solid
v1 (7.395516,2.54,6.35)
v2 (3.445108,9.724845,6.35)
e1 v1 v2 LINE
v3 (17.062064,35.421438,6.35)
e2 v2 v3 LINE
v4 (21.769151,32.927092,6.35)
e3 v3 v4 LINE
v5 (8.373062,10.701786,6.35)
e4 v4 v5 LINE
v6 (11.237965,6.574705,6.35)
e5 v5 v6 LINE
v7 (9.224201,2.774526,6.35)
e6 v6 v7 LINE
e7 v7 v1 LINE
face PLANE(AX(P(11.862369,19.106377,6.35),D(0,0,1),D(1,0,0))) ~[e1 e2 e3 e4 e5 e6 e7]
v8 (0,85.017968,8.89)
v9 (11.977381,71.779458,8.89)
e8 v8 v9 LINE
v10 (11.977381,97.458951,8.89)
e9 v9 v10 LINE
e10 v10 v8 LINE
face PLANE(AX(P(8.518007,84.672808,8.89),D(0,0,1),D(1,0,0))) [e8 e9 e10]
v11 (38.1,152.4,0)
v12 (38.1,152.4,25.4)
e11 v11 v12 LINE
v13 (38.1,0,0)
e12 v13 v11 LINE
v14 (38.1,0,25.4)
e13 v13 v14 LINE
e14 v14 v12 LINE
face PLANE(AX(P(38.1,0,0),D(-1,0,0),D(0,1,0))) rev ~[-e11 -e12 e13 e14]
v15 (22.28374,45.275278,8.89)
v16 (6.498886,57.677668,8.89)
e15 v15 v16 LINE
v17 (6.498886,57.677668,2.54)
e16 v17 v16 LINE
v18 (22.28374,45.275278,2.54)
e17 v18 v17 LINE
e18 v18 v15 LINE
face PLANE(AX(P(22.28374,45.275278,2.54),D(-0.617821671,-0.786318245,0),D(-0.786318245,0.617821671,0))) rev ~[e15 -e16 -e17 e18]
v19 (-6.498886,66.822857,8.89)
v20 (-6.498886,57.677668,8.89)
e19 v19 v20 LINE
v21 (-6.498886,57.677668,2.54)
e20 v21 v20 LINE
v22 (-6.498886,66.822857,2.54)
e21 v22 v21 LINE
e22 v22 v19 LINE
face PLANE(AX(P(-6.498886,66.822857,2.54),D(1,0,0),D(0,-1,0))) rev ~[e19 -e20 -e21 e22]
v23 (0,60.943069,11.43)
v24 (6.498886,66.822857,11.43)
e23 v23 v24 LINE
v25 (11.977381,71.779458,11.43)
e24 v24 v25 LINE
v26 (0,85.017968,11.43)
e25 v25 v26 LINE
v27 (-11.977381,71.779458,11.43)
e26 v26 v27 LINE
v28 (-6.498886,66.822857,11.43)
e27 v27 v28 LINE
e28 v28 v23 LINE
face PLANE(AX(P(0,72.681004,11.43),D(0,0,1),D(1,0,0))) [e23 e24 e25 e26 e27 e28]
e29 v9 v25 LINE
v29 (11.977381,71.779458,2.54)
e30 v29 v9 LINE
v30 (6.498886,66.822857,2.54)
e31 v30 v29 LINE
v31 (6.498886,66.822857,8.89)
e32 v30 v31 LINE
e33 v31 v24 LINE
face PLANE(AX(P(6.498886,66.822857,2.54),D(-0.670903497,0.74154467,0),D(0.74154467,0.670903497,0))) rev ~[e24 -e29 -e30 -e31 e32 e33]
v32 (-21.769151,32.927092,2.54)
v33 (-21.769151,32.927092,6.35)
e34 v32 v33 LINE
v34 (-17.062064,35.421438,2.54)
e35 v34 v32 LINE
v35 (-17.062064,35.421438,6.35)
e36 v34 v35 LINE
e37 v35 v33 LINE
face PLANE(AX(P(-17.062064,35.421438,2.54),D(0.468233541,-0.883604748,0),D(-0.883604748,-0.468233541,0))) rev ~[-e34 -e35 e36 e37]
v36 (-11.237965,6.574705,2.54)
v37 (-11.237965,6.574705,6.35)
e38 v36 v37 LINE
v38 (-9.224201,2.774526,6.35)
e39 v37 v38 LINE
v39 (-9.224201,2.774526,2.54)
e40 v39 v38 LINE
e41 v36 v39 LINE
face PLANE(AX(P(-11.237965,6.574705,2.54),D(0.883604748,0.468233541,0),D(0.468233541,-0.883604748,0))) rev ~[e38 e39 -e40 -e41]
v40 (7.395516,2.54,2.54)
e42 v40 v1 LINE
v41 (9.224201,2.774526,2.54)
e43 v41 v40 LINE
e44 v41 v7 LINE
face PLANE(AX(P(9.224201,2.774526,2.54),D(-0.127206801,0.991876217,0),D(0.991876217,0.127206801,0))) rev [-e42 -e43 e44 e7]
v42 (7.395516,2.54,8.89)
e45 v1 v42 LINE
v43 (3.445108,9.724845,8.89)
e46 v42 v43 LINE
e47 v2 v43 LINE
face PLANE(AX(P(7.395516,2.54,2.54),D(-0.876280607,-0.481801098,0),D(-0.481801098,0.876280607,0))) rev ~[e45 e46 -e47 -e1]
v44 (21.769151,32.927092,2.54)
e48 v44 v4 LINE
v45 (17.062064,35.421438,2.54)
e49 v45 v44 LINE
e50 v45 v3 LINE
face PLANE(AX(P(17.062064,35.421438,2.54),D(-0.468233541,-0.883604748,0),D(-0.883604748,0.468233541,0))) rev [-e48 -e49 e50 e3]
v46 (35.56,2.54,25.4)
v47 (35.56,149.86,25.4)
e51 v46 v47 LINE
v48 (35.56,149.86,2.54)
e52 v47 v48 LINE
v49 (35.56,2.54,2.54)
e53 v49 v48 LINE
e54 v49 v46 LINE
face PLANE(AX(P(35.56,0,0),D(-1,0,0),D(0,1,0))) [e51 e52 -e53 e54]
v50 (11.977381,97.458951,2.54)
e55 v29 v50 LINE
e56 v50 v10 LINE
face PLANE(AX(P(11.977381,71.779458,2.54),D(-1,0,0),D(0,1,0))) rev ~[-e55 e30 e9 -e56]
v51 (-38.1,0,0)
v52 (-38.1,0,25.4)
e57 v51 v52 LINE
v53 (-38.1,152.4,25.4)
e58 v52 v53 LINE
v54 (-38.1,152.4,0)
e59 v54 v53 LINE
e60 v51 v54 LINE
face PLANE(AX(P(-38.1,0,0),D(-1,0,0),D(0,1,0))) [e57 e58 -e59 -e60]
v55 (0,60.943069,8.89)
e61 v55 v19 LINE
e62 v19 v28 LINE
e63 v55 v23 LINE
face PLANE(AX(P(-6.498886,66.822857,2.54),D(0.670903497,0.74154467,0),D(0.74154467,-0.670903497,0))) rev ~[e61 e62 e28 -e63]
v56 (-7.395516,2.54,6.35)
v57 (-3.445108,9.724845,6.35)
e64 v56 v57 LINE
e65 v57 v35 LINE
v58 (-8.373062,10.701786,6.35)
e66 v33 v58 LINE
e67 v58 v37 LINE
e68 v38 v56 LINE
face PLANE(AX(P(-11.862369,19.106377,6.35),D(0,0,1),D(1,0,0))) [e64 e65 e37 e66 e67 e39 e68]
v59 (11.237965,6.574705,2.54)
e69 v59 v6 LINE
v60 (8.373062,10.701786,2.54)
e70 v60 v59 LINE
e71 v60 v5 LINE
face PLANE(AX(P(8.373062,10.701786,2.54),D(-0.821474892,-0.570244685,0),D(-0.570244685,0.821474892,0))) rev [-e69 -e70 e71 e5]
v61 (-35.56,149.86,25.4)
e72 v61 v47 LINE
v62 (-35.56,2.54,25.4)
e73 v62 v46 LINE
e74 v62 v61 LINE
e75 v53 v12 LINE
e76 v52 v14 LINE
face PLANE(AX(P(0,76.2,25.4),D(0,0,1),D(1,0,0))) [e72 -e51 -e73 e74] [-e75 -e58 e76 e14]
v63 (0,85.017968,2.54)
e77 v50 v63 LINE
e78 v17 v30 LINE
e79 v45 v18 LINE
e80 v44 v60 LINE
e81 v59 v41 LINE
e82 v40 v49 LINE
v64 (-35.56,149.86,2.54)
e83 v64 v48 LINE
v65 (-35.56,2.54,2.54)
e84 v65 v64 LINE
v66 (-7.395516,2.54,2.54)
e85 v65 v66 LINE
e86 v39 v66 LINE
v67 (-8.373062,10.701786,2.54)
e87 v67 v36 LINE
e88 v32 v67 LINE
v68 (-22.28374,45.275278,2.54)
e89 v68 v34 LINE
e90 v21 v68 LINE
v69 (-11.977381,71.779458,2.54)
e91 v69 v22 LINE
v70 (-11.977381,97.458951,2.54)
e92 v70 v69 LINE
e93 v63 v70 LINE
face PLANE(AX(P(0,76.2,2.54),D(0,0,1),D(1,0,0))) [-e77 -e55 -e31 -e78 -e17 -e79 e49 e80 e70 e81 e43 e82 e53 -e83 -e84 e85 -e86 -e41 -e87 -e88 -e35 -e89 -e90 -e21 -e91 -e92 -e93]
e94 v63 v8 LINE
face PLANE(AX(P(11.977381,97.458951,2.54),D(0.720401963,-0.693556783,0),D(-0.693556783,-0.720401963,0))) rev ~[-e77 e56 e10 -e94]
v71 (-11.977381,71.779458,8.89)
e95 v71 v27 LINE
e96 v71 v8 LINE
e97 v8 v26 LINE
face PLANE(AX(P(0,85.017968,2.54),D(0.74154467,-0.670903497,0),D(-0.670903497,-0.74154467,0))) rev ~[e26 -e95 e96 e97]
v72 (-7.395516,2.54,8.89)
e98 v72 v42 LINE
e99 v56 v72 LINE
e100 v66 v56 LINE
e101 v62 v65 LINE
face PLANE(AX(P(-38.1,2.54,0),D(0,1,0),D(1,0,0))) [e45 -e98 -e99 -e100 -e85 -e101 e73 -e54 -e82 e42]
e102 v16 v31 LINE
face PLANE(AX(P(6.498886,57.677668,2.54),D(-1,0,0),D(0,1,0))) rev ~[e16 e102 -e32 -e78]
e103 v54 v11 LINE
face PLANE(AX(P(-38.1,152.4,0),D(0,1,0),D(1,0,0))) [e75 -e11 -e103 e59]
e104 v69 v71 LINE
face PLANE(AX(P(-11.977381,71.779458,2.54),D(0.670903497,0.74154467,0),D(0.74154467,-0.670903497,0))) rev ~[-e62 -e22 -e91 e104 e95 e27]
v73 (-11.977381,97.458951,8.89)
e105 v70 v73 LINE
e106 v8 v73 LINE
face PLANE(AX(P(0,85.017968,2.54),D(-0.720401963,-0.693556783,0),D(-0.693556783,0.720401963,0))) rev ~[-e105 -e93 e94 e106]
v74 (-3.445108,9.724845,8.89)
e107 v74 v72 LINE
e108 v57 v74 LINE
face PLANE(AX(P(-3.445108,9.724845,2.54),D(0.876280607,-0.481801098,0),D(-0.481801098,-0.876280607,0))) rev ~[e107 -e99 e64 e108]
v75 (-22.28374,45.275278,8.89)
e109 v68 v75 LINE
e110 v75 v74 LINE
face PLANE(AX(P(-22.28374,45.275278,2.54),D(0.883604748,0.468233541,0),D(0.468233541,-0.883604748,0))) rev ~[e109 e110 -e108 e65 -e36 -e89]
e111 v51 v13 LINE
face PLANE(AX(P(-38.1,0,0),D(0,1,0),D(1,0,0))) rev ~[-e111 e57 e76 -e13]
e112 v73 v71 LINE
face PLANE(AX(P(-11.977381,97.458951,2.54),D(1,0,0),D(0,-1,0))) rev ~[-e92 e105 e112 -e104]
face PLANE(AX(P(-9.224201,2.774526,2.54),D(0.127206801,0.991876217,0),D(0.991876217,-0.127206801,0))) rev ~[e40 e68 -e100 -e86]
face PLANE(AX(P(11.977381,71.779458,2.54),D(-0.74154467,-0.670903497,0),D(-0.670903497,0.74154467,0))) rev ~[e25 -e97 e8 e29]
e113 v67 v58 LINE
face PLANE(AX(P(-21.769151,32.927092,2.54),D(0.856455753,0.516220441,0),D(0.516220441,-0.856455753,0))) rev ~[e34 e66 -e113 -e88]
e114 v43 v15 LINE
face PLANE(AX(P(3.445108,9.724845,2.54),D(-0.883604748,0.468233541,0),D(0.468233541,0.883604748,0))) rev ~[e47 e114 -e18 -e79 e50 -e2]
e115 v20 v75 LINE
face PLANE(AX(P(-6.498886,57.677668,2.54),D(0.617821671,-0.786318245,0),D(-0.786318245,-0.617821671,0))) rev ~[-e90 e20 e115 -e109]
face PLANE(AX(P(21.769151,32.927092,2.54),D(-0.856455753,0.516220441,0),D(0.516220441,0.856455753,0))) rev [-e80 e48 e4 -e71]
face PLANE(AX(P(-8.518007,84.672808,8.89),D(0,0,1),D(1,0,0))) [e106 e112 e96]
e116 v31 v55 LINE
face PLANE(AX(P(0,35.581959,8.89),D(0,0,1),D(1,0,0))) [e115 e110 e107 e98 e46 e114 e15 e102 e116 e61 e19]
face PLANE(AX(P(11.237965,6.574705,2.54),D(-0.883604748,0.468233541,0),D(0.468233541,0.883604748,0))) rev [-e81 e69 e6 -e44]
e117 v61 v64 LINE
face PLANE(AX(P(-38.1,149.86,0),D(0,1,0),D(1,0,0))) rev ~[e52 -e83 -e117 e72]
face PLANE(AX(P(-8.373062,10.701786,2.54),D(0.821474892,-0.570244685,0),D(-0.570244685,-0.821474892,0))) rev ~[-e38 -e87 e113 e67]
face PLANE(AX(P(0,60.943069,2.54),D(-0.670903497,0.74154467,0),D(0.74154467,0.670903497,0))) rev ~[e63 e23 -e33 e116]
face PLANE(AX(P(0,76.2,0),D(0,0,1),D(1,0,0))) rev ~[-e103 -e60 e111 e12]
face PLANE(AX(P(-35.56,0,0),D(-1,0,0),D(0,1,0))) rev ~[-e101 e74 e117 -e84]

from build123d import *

# Parameters (mm, degrees)
F0_W      = 76.2
F0_H      = 152.4
F1_DEPTH  = 25.4
F2_T      = -2.54
F4_DEPTH  = 6.35
F6_DEPTH  = 8.89
F8_DEPTH  = 6.35
F10_DEPTH = 3.81


# Not quite as in the source:
# - a pattern or mirror of a feature is missing from the dataset's text; its kind, count and spacing are read off the source's solid


with BuildPart() as f1:
    # F0 (on Top) → F1 (new body)
    with BuildSketch(Plane.XY):
        with Locations((0, 76.2)):
            Rectangle(F0_W, F0_H)
    extrude(amount=F1_DEPTH)

    # F2
    f2_openings = [f1.faces().sort_by_distance(p)[0] for p in [
        (0, 76.2, 25.4),
    ]]
    offset(amount=F2_T, openings=f2_openings)

    # F3 (on face) → F4 (join)
    with BuildSketch(Plane.XY.offset(2.54)):
        Polygon((-6.4988862723, 57.677667588), (-22.2837403417, 45.2752783895), (-3.4451077227, 9.7248451784), (-7.3955161497, 2.54), (7.3955161497, 2.54), (3.4451077227, 9.7248451784), (22.2837403417, 45.2752783895), (6.4988862723, 57.677667588), (6.4988862723, 66.8228566647), (0, 60.9430685656), (-6.4988862723, 66.8228566647), align=None)
    extrude(amount=F4_DEPTH)

    # F5 (on face) → F6 (join)
    with BuildSketch(Plane.XY.offset(2.54)):
        Polygon((-6.4988862723, 66.8228566647), (0, 60.9430685656), (6.4988862723, 66.8228566647), (11.9773805831, 71.7794575804), (0, 85.0179677), (-11.9773805831, 71.7794575804), align=None)
    extrude(amount=F6_DEPTH)

    # F7 (on face) → F8 (join)
    with BuildSketch(Plane.XY.offset(2.54)):
        Polygon((11.9773805831, 97.4589511752), (0, 85.0179677), (11.9773805831, 71.7794575804), align=None)
        Polygon((-11.9773805831, 97.4589511752), (-11.9773805831, 71.7794575804), (0, 85.0179677), align=None)
    extrude(amount=F8_DEPTH)

    # F9 (on face) → F10 (join)
    with BuildSketch(Plane.XY.offset(2.54)):
        Polygon((-3.4451077227, 9.7248451784), (-17.0620636054, 35.4214384736), (-21.7691510916, 32.9270921648), (-8.3730621263, 10.7017857954), (-11.2379649654, 6.5747052431), (-9.2242012438, 2.7745264226), (-7.3955161497, 2.54), align=None)
    f10 = extrude(amount=F10_DEPTH)

    # F10_copies: F10 across plane
    add(f10.mirror(Plane(origin=(0, 0, 0), x_dir=(0, 0, 1), z_dir=(1, 0, 0))))


solid = f1.part
